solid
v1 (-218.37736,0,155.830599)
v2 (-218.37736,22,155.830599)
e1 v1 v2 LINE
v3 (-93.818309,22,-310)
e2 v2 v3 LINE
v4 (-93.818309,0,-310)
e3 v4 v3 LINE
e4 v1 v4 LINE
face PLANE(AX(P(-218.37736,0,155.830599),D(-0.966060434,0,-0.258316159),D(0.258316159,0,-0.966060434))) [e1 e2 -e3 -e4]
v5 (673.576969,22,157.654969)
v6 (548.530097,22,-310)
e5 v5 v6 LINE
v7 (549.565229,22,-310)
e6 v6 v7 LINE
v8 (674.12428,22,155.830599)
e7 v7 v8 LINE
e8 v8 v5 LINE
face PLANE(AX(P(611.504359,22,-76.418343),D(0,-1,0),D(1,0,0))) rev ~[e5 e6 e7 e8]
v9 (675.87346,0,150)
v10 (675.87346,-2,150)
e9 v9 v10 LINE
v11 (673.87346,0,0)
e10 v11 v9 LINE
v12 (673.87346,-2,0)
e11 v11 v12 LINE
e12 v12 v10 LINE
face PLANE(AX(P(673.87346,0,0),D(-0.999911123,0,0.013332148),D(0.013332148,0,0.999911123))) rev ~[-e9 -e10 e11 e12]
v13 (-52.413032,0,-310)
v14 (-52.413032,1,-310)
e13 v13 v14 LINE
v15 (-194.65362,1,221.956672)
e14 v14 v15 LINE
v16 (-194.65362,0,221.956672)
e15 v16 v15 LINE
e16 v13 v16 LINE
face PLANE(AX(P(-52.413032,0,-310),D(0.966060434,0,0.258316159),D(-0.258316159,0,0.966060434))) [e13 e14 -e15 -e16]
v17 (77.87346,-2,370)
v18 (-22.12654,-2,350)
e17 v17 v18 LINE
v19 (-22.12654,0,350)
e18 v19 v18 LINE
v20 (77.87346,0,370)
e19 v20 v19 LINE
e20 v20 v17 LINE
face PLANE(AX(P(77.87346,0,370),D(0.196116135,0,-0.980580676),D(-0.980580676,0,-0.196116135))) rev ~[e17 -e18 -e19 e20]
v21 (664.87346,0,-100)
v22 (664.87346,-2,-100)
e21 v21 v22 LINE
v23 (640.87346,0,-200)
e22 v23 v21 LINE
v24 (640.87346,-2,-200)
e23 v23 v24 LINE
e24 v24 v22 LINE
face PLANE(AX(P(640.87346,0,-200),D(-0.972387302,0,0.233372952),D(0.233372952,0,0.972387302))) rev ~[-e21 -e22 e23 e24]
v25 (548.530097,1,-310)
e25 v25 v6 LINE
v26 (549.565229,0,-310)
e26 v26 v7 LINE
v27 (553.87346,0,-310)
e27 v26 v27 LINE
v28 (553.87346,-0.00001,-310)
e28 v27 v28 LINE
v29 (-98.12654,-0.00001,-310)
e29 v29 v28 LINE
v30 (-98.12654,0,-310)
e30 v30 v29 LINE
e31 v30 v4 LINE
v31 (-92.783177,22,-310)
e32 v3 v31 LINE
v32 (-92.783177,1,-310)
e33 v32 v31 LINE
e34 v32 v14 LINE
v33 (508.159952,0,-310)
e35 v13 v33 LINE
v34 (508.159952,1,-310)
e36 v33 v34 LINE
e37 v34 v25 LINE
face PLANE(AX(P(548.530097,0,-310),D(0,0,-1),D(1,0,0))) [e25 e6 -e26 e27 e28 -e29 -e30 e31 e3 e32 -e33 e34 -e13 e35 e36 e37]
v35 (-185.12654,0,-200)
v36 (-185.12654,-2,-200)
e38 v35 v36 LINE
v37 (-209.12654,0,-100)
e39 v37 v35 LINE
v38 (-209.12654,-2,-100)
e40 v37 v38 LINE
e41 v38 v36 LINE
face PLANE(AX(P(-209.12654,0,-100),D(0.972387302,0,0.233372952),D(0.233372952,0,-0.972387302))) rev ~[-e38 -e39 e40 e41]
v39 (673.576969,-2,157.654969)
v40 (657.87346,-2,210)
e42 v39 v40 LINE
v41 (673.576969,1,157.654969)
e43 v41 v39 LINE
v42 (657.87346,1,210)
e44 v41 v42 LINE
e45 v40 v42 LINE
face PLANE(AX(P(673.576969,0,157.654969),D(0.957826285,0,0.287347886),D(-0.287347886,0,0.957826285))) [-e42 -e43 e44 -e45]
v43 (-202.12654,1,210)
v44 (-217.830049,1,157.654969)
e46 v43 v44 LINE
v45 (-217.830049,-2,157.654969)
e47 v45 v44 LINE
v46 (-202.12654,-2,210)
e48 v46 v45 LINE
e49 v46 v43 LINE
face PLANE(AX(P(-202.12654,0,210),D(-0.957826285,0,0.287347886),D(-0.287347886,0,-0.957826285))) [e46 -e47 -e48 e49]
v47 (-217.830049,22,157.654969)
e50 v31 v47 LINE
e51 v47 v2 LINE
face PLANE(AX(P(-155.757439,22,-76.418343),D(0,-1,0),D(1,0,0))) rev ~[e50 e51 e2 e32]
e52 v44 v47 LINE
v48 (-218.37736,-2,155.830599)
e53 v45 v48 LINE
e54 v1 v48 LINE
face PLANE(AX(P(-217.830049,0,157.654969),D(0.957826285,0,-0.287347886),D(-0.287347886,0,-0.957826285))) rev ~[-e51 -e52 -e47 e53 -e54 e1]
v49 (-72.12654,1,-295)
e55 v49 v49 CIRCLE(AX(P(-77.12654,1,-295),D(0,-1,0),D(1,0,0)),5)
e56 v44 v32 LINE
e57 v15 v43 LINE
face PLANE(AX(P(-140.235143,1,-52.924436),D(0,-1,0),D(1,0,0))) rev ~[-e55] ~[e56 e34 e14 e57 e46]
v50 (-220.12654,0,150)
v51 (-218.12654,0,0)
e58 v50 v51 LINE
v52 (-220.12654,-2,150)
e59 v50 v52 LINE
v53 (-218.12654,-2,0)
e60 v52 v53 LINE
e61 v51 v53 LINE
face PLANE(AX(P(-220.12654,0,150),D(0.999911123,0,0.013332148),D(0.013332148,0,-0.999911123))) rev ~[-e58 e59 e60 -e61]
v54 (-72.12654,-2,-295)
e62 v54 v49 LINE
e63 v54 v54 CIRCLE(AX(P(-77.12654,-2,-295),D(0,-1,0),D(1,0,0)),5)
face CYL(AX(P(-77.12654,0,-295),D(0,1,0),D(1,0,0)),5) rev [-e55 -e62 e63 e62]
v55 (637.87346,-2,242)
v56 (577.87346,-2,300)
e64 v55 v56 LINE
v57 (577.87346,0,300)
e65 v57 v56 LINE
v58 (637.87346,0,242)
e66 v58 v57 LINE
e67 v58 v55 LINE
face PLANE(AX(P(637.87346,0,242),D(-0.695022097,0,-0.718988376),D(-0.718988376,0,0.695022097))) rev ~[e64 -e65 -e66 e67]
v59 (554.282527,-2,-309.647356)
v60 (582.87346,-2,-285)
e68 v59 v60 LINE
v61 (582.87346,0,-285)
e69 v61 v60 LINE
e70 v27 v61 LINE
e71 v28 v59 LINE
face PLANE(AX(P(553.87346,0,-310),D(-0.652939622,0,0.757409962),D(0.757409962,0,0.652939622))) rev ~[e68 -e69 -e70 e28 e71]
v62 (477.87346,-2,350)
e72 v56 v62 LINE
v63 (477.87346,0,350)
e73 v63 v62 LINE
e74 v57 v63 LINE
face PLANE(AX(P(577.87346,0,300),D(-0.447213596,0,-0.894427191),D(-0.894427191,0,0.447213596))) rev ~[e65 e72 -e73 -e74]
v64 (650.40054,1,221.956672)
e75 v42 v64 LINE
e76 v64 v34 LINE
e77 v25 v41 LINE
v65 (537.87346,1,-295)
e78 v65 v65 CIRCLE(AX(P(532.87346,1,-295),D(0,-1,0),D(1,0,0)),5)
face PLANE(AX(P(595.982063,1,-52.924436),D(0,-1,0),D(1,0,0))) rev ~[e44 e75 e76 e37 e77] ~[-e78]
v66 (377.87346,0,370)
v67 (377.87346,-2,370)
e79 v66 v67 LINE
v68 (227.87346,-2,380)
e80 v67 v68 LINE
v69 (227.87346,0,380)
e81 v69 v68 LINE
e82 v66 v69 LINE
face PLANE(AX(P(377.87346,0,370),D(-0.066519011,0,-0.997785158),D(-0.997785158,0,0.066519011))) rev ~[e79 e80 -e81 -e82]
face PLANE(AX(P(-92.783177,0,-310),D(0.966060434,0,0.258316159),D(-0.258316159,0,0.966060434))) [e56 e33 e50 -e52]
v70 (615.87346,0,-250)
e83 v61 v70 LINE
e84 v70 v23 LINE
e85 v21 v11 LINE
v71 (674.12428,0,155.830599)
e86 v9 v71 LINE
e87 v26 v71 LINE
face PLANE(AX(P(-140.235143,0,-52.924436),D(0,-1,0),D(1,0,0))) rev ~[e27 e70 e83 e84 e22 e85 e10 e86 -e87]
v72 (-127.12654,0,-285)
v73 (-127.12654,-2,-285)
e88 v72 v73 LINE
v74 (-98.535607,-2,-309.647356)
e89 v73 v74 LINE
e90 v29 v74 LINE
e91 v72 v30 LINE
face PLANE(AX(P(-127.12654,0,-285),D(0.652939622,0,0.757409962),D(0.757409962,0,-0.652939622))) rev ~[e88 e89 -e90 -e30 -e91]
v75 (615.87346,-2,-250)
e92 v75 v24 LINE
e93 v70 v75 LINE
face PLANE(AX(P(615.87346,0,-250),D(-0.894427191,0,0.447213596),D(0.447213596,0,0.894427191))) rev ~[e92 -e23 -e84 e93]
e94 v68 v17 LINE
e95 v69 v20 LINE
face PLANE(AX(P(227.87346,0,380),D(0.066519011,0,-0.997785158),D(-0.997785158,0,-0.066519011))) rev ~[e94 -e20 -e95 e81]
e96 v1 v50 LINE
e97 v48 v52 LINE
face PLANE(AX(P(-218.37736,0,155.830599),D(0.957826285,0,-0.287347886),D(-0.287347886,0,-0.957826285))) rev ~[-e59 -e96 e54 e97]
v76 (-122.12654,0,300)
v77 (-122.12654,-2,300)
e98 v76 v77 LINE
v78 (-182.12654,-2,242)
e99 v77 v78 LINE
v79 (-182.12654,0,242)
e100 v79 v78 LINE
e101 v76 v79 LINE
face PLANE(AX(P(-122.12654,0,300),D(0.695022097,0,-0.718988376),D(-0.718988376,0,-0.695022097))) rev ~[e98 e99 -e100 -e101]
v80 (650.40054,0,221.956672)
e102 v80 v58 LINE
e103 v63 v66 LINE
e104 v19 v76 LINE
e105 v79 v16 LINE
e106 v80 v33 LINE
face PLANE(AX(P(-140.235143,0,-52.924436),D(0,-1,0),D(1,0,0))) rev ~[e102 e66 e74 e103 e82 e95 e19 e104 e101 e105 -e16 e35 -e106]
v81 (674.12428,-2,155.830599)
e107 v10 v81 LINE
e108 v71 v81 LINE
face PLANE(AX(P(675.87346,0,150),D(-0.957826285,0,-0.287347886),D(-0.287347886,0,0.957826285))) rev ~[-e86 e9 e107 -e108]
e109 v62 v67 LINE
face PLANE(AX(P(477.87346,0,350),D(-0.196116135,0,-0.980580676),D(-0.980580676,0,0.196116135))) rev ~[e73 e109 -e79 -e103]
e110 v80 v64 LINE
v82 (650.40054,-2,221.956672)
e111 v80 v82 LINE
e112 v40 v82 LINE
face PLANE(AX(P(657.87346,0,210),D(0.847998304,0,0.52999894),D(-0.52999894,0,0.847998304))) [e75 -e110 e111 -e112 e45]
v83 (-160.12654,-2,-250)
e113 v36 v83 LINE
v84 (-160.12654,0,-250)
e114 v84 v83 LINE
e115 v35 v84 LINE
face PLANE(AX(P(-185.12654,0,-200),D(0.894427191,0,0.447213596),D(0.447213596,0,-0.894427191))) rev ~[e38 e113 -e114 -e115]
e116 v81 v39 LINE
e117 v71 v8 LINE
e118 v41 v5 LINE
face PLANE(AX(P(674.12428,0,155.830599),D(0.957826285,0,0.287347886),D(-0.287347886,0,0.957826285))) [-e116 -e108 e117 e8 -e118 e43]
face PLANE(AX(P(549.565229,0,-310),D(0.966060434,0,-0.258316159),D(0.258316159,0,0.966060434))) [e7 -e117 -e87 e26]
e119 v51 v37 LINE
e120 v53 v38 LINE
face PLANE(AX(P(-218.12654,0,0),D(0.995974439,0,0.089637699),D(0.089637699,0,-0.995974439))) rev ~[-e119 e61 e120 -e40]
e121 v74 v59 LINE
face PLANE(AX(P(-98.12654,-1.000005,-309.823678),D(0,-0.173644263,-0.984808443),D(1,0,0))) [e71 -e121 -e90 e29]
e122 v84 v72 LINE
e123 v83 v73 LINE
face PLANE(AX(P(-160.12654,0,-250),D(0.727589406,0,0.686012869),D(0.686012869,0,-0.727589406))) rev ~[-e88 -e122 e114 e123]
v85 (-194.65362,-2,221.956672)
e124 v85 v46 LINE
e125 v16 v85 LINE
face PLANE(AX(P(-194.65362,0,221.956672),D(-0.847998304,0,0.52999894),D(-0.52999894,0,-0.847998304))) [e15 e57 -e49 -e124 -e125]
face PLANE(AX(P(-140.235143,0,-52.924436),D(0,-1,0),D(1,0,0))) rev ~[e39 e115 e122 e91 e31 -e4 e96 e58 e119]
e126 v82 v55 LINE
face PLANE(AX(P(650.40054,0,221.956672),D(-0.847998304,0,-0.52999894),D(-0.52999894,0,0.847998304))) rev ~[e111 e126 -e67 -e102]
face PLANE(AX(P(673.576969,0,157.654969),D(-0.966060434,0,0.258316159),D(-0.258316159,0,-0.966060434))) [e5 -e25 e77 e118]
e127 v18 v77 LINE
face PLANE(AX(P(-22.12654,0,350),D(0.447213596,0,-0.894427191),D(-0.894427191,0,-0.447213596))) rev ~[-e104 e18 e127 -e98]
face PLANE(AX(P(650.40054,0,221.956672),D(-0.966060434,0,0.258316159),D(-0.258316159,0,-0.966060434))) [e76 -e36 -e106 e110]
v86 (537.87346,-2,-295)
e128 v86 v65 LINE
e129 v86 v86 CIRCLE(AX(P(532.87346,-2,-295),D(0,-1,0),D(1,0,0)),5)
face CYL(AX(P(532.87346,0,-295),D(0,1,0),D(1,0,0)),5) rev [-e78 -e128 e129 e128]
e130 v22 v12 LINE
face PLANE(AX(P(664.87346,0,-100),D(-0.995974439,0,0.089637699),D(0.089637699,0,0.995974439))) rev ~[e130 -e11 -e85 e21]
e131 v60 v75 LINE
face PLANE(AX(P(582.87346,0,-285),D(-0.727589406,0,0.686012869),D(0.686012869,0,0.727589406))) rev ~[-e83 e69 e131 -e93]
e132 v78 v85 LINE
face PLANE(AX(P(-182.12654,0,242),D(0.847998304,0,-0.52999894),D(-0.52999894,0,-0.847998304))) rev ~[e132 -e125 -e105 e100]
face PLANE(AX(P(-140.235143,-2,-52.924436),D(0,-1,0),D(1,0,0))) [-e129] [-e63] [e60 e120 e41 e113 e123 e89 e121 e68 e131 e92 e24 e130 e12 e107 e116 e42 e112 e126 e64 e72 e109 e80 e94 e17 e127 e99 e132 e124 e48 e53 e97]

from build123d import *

# Parameters (mm, degrees)
F0_R     = 5
F1_DEPTH = 2
F2_DEPTH = 1
F3_DEPTH = 22
F4_SIZE2 = 0.352644
F4_SIZE  = 1.99999


# Not quite as in the source:
# - a fillet or chamfer is up to 0.001 mm smaller than in the source, because OpenCascade refuses the exact size


with BuildPart() as f1:
    # F0 (on Front) → F1 (new body)
    with BuildSketch(Plane.XZ):
        Polygon((-202.1265400052, 210), (-217.8300492651, 157.6549691337), (-92.7831770837, -310), (-52.4130318677, -310), (-194.6536201768, 221.9566717254), align=None)
        with Locations((-77.1265400052, -295)):
            Circle(F0_R, mode=Mode.SUBTRACT)
        Polygon((-182.1265400052, 242), (-194.6536201768, 221.9566717254), (-52.4130318677, -310), (227.8734599948, -310), (508.1599518573, -310), (650.4005401664, 221.9566717254), (637.8734599948, 242), (577.8734599948, 300), (477.8734599948, 350), (377.8734599948, 370), (227.8734599948, 380), (77.8734599948, 370), (-22.1265400052, 350), (-122.1265400052, 300), align=None)
        Polygon((650.4005401664, 221.9566717254), (508.1599518573, -310), (548.5300970733, -310), (673.5769692547, 157.6549691337), (657.8734599948, 210), align=None)
        with Locations((532.8734599948, -295)):
            Circle(F0_R, mode=Mode.SUBTRACT)
        Polygon((-220.1265400052, 150), (-218.1265400052, 0), (-209.1265400052, -100), (-185.1265400052, -200), (-160.1265400052, -250), (-127.1265400052, -285), (-98.1265400052, -310), (-93.8183090123, -310), (-218.3773603998, 155.8305986848), align=None)
        Polygon((674.1242803894, 155.8305986848), (549.5652290019, -310), (553.8734599948, -310), (582.8734599948, -285), (615.8734599948, -250), (640.8734599948, -200), (664.8734599948, -100), (673.8734599948, 0), (675.8734599948, 150), align=None)
        Polygon((673.5769692547, 157.6549691337), (548.5300970733, -310), (549.5652290019, -310), (674.1242803894, 155.8305986848), align=None)
        Polygon((-217.8300492651, 157.6549691337), (-218.3773603998, 155.8305986848), (-93.8183090123, -310), (-92.7831770837, -310), align=None)
    extrude(amount=F1_DEPTH)

    # F0 (on Front) → F2 (join)
    with BuildSketch(Plane.XZ):
        Polygon((-202.1265400052, 210), (-217.8300492651, 157.6549691337), (-92.7831770837, -310), (-52.4130318677, -310), (-194.6536201768, 221.9566717254), align=None)
        with Locations((-77.1265400052, -295)):
            Circle(F0_R, mode=Mode.SUBTRACT)
        Polygon((650.4005401664, 221.9566717254), (508.1599518573, -310), (548.5300970733, -310), (673.5769692547, 157.6549691337), (657.8734599948, 210), align=None)
        with Locations((532.8734599948, -295)):
            Circle(F0_R, mode=Mode.SUBTRACT)
    extrude(amount=-F2_DEPTH)

    # F0 (on Front) → F3 (join)
    with BuildSketch(Plane.XZ):
        Polygon((673.5769692547, 157.6549691337), (548.5300970733, -310), (549.5652290019, -310), (674.1242803894, 155.8305986848), align=None)
        Polygon((-217.8300492651, 157.6549691337), (-218.3773603998, 155.8305986848), (-93.8183090123, -310), (-92.7831770837, -310), align=None)
    extrude(amount=-F3_DEPTH)

    # F4 (size 2 and 0.3526539614 in the source; OpenCascade refuses exactly that, so slightly less here)
    f4_edges = [f1.edges().sort_by_distance(p)[0] for p in [
        (227.87346, -2, -310),
    ]]
    f4_side = f1.faces().sort_by_distance((227.87346, -0.533198, -310))[0]
    chamfer(f4_edges, length=F4_SIZE, length2=F4_SIZE2, reference=f4_side)


solid = f1.part
